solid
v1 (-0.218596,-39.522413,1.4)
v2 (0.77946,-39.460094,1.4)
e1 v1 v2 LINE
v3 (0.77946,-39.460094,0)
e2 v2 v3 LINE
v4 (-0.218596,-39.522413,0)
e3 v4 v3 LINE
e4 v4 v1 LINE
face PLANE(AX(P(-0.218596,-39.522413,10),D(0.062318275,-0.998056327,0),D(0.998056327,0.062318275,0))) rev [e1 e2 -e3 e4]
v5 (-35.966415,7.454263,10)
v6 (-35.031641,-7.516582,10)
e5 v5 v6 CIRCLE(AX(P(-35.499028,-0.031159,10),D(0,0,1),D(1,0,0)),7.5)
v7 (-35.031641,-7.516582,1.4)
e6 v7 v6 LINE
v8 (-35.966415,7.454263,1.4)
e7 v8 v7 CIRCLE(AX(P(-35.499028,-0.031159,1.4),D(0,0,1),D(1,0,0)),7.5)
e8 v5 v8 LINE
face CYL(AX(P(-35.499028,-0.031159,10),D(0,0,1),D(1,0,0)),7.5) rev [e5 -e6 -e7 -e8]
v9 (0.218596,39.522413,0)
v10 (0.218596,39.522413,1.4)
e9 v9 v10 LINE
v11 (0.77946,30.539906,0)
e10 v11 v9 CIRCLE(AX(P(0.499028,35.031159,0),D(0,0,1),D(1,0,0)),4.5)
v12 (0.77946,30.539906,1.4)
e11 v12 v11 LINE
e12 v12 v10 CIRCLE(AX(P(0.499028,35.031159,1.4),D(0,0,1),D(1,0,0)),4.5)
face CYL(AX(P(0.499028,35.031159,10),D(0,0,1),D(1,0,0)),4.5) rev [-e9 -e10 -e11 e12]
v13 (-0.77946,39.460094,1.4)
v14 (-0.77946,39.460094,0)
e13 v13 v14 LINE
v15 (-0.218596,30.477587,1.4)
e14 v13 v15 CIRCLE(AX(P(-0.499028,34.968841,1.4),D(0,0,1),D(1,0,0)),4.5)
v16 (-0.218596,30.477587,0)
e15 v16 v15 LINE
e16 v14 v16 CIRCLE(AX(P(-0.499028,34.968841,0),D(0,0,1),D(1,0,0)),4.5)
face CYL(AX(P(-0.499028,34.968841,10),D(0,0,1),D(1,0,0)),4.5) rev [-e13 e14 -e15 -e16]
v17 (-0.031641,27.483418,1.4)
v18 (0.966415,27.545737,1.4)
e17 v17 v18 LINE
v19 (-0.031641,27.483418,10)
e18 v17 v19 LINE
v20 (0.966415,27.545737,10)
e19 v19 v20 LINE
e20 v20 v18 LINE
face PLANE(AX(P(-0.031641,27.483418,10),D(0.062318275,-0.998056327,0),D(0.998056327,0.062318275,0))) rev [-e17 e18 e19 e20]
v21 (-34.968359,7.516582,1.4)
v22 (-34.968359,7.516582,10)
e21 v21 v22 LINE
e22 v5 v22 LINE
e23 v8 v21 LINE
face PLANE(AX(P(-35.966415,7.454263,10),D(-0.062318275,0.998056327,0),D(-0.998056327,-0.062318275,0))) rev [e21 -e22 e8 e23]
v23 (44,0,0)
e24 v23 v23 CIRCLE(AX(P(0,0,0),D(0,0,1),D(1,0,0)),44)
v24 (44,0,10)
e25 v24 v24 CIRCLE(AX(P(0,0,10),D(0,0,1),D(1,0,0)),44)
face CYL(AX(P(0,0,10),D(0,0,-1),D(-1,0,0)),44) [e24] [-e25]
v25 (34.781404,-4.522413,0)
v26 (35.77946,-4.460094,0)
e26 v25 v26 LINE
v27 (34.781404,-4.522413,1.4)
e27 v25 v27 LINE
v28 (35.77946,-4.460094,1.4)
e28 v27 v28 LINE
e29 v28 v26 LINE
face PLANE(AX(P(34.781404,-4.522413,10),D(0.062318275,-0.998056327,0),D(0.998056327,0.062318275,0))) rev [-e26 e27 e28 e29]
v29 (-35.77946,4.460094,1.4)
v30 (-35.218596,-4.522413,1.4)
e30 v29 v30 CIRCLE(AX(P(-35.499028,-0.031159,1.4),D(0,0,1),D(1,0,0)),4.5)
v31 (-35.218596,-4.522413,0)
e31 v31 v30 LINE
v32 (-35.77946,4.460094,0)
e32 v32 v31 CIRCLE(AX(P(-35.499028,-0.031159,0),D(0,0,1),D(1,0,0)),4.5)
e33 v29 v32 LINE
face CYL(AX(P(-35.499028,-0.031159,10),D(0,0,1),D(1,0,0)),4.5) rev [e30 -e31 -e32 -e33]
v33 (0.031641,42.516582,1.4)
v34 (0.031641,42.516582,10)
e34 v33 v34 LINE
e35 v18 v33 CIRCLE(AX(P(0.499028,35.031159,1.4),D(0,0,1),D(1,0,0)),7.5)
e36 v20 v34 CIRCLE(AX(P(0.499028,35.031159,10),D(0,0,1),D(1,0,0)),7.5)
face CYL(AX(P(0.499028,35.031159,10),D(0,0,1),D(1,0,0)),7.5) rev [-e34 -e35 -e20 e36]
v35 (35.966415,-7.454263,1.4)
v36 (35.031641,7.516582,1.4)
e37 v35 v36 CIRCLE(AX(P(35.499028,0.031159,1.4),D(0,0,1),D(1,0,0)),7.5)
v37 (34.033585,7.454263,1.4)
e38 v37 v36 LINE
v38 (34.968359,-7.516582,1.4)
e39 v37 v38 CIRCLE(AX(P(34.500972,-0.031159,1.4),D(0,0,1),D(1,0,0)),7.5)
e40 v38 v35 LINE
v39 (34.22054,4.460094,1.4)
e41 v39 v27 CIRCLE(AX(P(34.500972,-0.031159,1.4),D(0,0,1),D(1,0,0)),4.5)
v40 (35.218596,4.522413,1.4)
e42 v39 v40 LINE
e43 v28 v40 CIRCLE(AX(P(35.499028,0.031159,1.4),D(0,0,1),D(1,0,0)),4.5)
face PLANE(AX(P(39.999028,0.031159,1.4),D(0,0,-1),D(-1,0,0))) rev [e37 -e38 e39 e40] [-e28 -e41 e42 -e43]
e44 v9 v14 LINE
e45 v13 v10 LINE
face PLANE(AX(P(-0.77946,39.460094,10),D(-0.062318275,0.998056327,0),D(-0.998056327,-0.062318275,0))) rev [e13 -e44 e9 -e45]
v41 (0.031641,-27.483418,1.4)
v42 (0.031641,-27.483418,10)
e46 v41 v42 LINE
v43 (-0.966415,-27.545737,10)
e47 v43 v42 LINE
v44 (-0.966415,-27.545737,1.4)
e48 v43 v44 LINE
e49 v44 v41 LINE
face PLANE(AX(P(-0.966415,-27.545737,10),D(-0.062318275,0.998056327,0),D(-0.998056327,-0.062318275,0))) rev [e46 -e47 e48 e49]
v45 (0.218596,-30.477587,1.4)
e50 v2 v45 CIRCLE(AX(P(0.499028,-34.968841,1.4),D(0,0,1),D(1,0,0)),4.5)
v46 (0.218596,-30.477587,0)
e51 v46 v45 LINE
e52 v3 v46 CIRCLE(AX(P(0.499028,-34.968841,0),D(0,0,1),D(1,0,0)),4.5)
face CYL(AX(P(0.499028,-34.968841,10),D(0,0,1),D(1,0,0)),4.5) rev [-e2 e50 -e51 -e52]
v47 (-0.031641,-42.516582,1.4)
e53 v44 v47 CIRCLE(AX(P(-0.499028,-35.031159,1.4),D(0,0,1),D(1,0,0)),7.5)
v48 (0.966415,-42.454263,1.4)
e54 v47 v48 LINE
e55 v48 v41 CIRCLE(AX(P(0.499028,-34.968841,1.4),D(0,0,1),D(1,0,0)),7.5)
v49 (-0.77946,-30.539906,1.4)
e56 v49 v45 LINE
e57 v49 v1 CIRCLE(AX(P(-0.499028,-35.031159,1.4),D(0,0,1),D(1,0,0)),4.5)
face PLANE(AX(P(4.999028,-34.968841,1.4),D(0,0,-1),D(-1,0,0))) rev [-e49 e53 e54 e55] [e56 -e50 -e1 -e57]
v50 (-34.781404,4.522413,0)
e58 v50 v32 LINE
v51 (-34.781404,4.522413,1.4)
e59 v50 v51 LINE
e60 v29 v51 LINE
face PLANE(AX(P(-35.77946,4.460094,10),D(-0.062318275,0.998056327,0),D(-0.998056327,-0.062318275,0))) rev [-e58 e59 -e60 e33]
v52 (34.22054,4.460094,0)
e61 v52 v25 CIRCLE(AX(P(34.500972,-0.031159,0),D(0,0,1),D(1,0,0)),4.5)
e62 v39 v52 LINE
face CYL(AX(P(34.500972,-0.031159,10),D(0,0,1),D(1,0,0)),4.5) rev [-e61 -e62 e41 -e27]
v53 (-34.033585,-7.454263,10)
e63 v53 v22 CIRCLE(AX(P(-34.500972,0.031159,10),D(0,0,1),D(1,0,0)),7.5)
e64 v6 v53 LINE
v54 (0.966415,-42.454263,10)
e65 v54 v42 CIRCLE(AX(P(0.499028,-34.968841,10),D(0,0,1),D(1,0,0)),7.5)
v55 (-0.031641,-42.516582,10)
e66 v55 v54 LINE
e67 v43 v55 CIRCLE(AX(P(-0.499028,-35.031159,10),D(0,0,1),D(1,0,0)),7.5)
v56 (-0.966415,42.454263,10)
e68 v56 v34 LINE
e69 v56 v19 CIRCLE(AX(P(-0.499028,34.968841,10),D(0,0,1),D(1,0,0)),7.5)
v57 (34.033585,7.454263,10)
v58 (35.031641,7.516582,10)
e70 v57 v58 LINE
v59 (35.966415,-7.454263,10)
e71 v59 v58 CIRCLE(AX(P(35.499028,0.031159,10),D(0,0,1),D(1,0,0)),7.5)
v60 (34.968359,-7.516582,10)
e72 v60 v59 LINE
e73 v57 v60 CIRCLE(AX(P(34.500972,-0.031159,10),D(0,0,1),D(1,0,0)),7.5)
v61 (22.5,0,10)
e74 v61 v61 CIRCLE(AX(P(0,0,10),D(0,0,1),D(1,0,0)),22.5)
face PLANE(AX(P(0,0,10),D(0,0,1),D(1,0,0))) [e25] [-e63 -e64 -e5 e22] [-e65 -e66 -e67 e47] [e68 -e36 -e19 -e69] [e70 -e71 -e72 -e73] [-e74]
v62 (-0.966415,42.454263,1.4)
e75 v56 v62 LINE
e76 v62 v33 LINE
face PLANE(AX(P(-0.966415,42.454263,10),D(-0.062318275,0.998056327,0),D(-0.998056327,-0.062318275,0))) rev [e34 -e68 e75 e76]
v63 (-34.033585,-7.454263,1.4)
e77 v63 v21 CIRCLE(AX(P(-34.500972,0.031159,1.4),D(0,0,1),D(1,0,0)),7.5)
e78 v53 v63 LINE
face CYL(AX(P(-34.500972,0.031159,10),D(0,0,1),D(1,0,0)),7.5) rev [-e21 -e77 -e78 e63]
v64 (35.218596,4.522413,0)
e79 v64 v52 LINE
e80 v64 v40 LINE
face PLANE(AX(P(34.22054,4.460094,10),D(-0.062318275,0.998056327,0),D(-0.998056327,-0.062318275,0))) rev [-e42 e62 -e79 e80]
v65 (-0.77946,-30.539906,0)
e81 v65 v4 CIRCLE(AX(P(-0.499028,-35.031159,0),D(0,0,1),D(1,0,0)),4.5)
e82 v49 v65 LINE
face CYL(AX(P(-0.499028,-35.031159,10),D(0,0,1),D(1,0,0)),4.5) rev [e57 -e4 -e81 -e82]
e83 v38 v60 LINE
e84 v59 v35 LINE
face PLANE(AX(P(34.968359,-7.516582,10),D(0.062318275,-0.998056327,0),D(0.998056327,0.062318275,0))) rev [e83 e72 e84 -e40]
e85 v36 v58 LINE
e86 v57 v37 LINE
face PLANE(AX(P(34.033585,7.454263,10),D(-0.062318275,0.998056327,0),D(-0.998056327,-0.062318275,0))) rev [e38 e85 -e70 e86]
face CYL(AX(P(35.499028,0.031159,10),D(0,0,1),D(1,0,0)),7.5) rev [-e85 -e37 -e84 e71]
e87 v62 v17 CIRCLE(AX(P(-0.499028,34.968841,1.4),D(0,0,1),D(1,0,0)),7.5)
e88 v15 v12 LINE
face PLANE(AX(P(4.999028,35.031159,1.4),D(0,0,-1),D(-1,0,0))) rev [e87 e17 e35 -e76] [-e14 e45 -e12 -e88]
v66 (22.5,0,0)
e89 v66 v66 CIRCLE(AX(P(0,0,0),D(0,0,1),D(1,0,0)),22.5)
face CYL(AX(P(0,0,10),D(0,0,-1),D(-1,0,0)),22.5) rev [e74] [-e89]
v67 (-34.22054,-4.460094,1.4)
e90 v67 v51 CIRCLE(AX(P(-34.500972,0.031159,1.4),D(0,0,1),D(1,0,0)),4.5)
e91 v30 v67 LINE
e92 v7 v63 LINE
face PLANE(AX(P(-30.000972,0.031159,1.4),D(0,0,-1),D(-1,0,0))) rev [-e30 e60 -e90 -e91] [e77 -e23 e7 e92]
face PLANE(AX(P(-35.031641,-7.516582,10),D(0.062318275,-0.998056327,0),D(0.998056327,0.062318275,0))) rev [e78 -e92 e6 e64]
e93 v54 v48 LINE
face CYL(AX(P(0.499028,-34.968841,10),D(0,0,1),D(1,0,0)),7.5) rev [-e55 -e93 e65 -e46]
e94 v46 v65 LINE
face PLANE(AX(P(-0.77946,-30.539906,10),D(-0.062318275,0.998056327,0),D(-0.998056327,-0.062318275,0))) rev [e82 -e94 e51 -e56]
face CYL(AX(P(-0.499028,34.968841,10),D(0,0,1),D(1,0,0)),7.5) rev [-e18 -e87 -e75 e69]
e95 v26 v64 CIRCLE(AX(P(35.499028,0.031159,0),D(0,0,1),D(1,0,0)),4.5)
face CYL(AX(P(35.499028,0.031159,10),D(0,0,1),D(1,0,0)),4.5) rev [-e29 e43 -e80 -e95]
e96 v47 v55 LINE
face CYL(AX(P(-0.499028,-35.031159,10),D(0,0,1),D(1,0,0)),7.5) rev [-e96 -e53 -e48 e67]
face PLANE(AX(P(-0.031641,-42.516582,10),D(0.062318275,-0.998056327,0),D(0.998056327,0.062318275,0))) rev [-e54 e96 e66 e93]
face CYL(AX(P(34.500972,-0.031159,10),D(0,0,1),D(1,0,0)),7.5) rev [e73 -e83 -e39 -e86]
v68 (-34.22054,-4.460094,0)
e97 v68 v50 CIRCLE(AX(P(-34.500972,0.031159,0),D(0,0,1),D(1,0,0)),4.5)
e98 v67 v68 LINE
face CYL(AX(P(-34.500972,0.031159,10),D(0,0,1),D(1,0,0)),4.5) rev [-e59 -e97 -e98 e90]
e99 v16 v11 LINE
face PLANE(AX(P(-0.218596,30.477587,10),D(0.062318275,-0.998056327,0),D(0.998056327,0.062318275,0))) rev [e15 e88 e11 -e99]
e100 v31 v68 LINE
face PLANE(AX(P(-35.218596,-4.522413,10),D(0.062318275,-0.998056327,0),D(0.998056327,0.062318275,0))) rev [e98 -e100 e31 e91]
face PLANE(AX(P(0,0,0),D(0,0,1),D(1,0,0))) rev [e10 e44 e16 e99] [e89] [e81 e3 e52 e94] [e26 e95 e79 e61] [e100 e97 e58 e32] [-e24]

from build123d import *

# Parameters (mm, degrees)
IZIM1_R                                     = 44
IZIM1_R_2                                   = 22.5
Y_KSEKLIK_EKSTR_ZYON1_DEPTH                 = 10
M8_START                                    = 1.4
M8_ALT_GEN_ALYAN_BA_L_K_R_VIDA_IN_HAV_DEPTH = 8.6
M8_ALT_GEN_ALYAN_BA_L_K_R_VIDA_IN_3_DEPTH   = 1.4


# Read off the part's stored shape, not the designer's step: M8 Altıgen Alyan Başlı Kör Vida İçin Havşa1
with BuildPart() as part:
    # Çizim1 → Yükseklik-Ekstrüzyon1 (new body)
    with BuildSketch(Plane.XY):
        Circle(IZIM1_R)
        Circle(IZIM1_R_2, mode=Mode.SUBTRACT)
    extrude(amount=Y_KSEKLIK_EKSTR_ZYON1_DEPTH)

    # M8 Alt_gen Alyan Ba_l_ K_r Vida _in  2 → M8 Altıgen Alyan Başlı Kör Vida İçin Havşa1 (cut)
    with BuildSketch(Plane.XY.offset(M8_START)):
        with BuildLine():
            Line((-35.031641101, -7.516581593), (-34.033584774, -7.454263318))
            ThreePointArc((-34.033584774, -7.454263318), (-27.015549381, 0.4985462), (-34.968358899, 7.516581593))
            Line((-34.968358899, 7.516581593), (-35.966415226, 7.454263318))
            ThreePointArc((-35.966415226, 7.454263318), (-42.984450619, -0.4985462), (-35.031641101, -7.516581593))
        make_face()
        with BuildLine():
            Line((-0.031641101, -42.516581593), (0.966415226, -42.454263318))
            ThreePointArc((0.966415226, -42.454263318), (7.984450619, -34.5014538), (0.031641101, -27.483418407))
            Line((0.031641101, -27.483418407), (-0.966415226, -27.545736682))
            ThreePointArc((-0.966415226, -27.545736682), (-7.984450619, -35.4985462), (-0.031641101, -42.516581593))
        make_face()
        with BuildLine():
            Line((34.968358899, -7.516581593), (35.966415226, -7.454263318))
            ThreePointArc((35.966415226, -7.454263318), (42.984450619, 0.4985462), (35.031641101, 7.516581593))
            Line((35.031641101, 7.516581593), (34.033584774, 7.454263318))
            ThreePointArc((34.033584774, 7.454263318), (27.015549381, -0.4985462), (34.968358899, -7.516581593))
        make_face()
        with BuildLine():
            Line((-0.031641101, 27.483418407), (0.966415226, 27.545736682))
            ThreePointArc((0.966415226, 27.545736682), (7.984450619, 35.4985462), (0.031641101, 42.516581593))
            Line((0.031641101, 42.516581593), (-0.966415226, 42.454263318))
            ThreePointArc((-0.966415226, 42.454263318), (-7.984450619, 34.5014538), (-0.031641101, 27.483418407))
        make_face()
    extrude(amount=M8_ALT_GEN_ALYAN_BA_L_K_R_VIDA_IN_HAV_DEPTH, mode=Mode.SUBTRACT)

    # M8 Alt_gen Alyan Ba_l_ K_r Vida _in 3 ou → M8 Alt_gen Alyan Ba_l_ K_r Vida _in  3 (cut)
    with BuildSketch(Plane.XY):
        with BuildLine():
            Line((-35.218595926, -4.522412611), (-34.220539599, -4.460094336))
            ThreePointArc((-34.220539599, -4.460094336), (-30.009718363, 0.311591375), (-34.781404074, 4.522412611))
            Line((-34.781404074, 4.522412611), (-35.779460401, 4.460094336))
            ThreePointArc((-35.779460401, 4.460094336), (-39.990281637, -0.311591375), (-35.218595926, -4.522412611))
        make_face()
        with BuildLine():
            ThreePointArc((-0.779460401, -30.539905664), (-4.990281637, -35.311591375), (-0.218595926, -39.522412611))
            Line((-0.218595926, -39.522412611), (0.779460401, -39.460094336))
            ThreePointArc((0.779460401, -39.460094336), (4.990281637, -34.688408625), (0.218595926, -30.477587389))
            Line((0.218595926, -30.477587389), (-0.779460401, -30.539905664))
        make_face()
        with BuildLine():
            Line((34.781404074, -4.522412611), (35.779460401, -4.460094336))
            ThreePointArc((35.779460401, -4.460094336), (39.990281637, 0.311591375), (35.218595926, 4.522412611))
            Line((35.218595926, 4.522412611), (34.220539599, 4.460094336))
            ThreePointArc((34.220539599, 4.460094336), (30.009718363, -0.311591375), (34.781404074, -4.522412611))
        make_face()
        with BuildLine():
            ThreePointArc((0.779460401, 30.539905664), (4.990281637, 35.311591375), (0.218595926, 39.522412611))
            Line((0.218595926, 39.522412611), (-0.779460401, 39.460094336))
            ThreePointArc((-0.779460401, 39.460094336), (-4.990281637, 34.688408625), (-0.218595926, 30.477587389))
            Line((-0.218595926, 30.477587389), (0.779460401, 30.539905664))
        make_face()
    extrude(amount=M8_ALT_GEN_ALYAN_BA_L_K_R_VIDA_IN_3_DEPTH, mode=Mode.SUBTRACT)


solid = part.part
